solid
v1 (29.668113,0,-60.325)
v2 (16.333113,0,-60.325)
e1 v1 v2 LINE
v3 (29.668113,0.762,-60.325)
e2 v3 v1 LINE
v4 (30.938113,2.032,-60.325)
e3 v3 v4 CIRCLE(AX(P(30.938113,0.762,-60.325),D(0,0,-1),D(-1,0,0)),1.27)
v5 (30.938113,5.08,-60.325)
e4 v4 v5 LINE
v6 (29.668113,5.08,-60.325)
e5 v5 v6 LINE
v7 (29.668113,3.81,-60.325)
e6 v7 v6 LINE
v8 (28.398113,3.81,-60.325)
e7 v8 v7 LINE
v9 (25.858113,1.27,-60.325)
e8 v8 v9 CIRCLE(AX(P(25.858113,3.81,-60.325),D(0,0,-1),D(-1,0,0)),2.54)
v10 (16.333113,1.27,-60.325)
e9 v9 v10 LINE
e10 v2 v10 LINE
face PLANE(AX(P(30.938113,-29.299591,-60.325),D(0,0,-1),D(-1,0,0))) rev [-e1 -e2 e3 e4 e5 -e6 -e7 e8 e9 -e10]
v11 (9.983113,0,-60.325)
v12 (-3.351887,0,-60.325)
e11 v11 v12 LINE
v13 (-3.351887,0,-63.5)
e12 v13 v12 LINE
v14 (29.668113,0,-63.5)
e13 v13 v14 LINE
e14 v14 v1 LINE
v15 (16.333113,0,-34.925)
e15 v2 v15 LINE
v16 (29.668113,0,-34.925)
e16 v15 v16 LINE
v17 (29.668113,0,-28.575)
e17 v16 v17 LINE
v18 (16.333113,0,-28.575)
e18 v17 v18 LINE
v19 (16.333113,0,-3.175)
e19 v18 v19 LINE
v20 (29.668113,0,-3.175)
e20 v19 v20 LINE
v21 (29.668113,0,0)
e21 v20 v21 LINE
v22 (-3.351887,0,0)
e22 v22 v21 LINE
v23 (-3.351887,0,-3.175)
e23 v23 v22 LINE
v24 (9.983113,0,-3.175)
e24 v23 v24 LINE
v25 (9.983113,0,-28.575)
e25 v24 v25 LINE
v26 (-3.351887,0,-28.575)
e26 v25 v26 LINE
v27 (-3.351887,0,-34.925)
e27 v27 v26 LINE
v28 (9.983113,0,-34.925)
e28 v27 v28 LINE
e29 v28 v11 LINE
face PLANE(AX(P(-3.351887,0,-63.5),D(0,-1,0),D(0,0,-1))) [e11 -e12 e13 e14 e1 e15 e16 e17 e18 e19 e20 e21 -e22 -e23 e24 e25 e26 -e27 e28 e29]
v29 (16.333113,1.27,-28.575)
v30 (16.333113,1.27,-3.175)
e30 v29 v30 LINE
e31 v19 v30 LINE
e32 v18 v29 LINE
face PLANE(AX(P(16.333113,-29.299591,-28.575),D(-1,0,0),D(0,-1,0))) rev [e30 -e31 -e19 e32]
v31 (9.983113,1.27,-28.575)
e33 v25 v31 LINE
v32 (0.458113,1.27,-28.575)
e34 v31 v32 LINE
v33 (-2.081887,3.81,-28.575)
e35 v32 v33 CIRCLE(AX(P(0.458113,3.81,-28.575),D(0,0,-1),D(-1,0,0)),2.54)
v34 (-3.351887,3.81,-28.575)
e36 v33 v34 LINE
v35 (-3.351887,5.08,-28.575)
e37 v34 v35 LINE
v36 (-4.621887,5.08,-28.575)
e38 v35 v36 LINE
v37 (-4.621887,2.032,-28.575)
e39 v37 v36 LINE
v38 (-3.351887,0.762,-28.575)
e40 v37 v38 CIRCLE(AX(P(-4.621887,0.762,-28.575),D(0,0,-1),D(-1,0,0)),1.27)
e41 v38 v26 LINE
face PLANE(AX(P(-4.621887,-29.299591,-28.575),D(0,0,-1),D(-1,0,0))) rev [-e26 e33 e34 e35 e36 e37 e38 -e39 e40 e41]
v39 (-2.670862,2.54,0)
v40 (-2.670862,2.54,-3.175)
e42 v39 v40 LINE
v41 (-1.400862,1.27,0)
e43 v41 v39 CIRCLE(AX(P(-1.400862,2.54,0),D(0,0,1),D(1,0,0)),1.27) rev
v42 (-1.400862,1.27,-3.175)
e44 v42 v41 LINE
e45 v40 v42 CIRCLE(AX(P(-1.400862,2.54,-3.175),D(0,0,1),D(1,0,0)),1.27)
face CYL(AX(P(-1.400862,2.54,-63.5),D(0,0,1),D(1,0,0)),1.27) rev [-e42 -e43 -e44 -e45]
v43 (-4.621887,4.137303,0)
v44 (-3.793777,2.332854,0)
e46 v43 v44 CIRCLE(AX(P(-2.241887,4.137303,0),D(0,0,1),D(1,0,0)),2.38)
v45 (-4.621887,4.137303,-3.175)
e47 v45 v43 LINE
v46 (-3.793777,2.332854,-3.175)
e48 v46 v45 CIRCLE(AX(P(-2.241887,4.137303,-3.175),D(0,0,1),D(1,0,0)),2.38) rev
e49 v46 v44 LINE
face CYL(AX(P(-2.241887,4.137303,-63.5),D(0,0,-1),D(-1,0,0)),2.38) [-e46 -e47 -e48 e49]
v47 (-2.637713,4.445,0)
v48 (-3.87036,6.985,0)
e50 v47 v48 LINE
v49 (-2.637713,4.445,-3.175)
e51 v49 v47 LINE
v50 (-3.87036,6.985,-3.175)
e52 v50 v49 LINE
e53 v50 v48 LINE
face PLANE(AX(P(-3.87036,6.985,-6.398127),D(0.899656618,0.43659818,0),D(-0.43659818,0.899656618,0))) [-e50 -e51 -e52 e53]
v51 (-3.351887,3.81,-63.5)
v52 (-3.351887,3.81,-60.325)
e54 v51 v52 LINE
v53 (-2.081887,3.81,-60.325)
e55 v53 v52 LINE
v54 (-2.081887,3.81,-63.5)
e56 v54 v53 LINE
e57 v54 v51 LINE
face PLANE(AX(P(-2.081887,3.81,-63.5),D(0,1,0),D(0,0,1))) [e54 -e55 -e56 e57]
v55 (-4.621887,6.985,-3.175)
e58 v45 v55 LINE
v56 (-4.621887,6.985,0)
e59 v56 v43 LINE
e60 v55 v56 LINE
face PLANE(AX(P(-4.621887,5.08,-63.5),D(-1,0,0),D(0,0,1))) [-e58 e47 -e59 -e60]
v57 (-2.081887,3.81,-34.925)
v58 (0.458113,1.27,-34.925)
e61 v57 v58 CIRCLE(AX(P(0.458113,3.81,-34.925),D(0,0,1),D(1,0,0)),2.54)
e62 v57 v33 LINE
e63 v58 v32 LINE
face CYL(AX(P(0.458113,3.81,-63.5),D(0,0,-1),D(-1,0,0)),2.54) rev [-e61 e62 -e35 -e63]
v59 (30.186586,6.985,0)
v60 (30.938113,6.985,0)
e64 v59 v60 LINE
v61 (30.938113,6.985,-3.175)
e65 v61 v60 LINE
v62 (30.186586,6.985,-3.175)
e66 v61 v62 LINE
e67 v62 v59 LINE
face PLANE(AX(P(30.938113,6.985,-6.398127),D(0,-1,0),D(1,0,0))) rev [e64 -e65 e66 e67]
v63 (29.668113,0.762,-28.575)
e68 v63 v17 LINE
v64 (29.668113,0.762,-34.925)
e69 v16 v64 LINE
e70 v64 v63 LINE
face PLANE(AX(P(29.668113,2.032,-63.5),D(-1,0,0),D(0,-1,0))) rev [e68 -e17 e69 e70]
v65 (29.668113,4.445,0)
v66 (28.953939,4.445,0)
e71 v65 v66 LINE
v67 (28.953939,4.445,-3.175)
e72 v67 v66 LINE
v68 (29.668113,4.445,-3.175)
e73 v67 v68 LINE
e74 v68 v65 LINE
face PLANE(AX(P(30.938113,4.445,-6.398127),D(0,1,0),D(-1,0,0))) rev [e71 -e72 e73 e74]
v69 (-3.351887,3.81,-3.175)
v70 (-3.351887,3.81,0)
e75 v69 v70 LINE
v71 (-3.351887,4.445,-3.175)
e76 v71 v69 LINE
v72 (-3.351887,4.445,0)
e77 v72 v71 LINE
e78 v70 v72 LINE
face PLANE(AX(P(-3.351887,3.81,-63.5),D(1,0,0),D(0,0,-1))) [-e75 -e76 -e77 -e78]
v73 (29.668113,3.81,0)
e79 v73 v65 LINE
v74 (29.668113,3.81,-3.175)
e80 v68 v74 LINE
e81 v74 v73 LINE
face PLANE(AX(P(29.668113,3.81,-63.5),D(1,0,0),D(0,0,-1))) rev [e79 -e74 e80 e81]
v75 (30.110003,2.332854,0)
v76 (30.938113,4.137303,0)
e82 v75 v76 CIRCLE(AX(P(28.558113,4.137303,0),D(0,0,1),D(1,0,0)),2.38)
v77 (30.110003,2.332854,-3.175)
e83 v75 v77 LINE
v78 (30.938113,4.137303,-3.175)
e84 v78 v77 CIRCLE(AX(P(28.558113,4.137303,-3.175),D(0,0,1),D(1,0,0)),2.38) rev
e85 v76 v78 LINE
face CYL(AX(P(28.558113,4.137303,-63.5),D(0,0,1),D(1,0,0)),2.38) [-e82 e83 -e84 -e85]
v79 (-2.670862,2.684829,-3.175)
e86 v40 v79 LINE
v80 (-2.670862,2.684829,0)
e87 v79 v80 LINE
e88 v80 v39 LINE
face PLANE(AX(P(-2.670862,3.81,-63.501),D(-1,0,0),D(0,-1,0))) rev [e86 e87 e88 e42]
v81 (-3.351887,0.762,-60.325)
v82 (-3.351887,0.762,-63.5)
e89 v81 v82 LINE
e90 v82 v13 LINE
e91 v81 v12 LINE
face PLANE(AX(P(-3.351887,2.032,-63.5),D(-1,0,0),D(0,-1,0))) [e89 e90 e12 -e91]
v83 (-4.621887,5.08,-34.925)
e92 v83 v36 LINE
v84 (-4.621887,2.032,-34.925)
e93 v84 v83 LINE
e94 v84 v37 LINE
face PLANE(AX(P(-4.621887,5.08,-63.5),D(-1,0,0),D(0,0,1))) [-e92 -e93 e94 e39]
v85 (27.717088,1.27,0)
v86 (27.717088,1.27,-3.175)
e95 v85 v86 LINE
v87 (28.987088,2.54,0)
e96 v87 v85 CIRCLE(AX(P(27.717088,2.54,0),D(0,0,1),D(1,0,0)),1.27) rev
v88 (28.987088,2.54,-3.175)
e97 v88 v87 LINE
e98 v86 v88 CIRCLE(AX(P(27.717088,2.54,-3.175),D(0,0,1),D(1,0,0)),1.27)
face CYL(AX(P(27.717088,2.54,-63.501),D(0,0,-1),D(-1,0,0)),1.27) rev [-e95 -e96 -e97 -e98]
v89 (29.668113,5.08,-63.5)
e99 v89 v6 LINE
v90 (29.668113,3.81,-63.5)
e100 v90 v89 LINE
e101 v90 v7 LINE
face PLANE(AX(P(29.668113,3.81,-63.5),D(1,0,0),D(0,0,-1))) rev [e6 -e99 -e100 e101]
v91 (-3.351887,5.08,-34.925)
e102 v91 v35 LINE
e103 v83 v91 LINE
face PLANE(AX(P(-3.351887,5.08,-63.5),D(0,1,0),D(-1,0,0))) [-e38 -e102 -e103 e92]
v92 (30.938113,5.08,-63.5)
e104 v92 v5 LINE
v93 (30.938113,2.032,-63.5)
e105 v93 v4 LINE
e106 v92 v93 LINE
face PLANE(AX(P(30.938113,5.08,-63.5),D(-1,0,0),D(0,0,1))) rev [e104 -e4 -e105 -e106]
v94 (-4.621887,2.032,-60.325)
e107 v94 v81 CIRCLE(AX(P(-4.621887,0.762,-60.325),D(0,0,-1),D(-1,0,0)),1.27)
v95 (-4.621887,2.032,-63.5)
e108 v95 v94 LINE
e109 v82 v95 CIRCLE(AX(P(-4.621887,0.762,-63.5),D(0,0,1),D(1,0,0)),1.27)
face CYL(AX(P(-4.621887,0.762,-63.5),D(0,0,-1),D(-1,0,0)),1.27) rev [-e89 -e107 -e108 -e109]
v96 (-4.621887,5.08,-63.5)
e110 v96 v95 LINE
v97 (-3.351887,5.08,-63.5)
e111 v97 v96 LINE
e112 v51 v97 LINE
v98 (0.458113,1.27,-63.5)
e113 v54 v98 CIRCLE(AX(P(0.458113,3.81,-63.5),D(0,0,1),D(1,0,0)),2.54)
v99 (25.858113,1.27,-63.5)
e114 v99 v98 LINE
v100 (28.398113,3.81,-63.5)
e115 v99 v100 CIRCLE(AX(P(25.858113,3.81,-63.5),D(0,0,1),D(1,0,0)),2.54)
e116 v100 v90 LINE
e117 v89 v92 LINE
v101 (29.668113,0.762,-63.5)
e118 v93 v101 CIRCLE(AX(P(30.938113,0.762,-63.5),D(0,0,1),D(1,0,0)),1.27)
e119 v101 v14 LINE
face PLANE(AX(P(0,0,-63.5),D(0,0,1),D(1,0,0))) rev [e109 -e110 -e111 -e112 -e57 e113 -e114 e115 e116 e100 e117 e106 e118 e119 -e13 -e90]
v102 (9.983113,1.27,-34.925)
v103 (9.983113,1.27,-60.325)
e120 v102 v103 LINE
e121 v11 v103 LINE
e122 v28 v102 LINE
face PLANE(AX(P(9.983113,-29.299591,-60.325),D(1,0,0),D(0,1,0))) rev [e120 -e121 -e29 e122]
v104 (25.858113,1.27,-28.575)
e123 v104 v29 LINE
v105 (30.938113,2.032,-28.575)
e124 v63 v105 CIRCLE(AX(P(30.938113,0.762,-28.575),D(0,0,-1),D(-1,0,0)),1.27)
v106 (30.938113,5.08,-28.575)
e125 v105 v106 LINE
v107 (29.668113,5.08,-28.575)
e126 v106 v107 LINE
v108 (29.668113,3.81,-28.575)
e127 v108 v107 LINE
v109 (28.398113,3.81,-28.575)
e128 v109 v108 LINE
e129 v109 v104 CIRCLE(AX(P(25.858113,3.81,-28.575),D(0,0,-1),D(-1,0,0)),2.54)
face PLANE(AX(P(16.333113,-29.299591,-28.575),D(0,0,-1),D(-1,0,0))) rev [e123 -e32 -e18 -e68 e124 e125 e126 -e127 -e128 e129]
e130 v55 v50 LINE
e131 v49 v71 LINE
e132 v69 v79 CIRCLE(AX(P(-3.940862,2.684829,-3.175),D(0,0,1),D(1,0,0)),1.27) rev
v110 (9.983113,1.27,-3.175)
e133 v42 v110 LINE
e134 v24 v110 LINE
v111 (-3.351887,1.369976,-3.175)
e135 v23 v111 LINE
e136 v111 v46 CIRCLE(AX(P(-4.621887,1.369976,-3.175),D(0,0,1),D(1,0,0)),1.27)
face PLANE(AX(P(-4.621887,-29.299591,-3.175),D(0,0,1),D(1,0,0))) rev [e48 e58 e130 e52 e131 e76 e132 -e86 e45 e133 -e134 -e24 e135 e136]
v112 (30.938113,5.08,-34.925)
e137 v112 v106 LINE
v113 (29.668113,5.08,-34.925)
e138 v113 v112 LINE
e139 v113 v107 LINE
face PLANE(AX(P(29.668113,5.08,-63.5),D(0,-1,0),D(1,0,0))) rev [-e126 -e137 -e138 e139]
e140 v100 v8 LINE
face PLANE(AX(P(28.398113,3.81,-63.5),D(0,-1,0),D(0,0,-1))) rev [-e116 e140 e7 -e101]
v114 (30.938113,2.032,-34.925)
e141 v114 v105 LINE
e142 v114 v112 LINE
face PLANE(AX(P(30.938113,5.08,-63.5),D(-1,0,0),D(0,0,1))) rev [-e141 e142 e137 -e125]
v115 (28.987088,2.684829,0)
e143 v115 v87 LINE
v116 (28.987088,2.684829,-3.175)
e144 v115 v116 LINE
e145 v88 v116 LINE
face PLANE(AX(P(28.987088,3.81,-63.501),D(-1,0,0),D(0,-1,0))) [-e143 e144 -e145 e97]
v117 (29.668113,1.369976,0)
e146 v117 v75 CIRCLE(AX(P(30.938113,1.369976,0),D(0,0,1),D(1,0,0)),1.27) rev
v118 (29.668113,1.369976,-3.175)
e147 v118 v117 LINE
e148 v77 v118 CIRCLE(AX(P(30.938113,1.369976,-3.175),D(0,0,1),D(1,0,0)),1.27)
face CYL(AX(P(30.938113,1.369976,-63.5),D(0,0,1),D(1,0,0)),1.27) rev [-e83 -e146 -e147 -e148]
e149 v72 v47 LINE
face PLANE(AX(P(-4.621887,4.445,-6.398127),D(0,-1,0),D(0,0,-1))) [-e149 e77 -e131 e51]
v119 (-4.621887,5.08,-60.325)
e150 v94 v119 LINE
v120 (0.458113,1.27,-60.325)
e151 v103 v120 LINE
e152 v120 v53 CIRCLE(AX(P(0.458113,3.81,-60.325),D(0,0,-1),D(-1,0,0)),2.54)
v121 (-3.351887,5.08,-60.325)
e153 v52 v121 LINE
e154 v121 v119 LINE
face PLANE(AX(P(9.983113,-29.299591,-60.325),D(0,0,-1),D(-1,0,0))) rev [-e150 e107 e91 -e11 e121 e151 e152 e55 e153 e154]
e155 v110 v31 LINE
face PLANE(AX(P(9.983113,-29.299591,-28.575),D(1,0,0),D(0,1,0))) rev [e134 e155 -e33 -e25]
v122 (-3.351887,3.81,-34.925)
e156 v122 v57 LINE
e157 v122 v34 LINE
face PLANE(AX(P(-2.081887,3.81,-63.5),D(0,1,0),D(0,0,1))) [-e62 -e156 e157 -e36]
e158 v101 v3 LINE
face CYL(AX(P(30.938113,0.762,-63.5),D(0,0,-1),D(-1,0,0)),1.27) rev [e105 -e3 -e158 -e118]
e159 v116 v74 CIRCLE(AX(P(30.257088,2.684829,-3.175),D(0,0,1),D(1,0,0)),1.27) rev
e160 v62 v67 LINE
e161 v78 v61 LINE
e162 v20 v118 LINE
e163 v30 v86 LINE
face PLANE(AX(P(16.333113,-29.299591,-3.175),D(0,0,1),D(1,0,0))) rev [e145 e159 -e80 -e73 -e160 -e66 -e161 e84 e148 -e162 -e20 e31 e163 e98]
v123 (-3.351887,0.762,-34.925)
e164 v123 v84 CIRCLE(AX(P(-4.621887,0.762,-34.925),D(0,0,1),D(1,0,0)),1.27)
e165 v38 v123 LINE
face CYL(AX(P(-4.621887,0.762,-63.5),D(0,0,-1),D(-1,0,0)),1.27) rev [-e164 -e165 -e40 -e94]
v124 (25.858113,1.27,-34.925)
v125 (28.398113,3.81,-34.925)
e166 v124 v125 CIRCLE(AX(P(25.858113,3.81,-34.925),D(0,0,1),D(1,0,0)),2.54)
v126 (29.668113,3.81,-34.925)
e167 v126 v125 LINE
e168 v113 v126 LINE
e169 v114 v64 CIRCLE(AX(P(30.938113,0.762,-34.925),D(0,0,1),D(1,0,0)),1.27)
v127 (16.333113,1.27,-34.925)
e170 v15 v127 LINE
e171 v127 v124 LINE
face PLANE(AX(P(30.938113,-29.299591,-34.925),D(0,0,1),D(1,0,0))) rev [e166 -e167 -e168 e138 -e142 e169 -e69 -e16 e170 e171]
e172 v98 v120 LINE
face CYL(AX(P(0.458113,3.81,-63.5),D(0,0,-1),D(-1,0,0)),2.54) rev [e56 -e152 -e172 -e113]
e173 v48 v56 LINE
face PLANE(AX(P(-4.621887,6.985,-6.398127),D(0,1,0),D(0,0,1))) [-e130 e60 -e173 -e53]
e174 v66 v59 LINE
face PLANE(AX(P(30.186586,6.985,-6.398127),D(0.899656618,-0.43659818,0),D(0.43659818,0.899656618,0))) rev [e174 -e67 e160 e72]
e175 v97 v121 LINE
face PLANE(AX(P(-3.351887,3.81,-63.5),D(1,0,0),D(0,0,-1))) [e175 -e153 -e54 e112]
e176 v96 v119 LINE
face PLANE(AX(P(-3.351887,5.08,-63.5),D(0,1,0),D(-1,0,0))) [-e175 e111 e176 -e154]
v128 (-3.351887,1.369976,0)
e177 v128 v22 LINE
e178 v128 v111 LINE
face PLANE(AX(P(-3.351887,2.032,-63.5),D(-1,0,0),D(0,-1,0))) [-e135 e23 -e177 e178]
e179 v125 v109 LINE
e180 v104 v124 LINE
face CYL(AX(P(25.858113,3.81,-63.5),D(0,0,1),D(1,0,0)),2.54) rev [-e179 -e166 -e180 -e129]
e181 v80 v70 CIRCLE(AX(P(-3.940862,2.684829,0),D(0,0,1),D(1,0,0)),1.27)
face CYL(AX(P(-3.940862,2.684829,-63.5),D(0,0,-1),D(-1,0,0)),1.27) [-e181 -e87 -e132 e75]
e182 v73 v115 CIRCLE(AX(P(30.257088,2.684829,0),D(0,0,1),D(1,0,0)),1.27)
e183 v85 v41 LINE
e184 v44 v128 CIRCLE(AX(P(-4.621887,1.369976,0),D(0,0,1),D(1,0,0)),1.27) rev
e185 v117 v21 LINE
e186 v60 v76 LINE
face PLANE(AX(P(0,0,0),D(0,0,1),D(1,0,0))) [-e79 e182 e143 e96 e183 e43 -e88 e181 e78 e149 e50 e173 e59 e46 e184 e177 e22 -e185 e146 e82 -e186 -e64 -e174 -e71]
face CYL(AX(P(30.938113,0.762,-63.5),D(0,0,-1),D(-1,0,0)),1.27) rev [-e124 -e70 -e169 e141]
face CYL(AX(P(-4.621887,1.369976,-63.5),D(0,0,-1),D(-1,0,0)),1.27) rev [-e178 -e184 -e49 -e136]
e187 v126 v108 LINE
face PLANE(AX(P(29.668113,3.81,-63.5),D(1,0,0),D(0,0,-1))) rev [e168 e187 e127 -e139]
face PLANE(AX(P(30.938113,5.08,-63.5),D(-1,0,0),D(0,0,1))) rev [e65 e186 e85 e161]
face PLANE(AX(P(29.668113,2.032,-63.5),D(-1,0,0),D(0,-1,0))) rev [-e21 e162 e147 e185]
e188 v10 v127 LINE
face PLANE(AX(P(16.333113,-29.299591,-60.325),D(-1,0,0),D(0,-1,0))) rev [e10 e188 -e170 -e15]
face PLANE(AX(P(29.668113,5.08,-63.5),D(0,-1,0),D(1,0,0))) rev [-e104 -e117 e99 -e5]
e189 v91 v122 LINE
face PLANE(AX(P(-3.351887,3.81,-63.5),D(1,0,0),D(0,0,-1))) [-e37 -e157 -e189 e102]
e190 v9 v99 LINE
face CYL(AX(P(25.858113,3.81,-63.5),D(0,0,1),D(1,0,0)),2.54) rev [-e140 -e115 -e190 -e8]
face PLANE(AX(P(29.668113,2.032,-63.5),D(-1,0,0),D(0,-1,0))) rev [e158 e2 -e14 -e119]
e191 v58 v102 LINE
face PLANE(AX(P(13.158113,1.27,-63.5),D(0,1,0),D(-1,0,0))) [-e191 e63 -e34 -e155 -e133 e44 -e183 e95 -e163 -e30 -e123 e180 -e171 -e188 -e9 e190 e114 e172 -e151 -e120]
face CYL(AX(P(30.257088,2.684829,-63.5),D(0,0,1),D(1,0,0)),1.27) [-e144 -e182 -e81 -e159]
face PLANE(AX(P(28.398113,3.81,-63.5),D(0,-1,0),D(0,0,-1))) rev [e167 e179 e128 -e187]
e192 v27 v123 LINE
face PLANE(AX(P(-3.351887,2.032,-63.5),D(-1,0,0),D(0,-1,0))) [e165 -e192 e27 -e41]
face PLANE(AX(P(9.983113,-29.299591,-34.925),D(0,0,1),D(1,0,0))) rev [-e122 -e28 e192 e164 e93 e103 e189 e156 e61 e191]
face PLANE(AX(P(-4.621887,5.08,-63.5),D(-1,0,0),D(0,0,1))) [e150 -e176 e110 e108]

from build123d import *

# Parameters (mm, degrees)
BOSS_EXTRUDE1_DEPTH = 63.5
CUT_EXTRUDE1_REACH  = 72.818
SKETCH2_W           = 14.605
SKETCH2_H           = 25.4
BOSS_EXTRUDE2_DEPTH = 3.175
CUT_EXTRUDE2_REACH  = 72.98
SKETCH4_W           = 0.588974589
SKETCH4_H           = 2.54
FILLET1_R           = 2.38
FILLET2_R           = 1.27
FILLET3_R           = 2.54
FILLET5_R           = 1.27
FILLET6_R           = 1.27


# Some blends are built 0.0001 mm under size
with BuildPart() as part:
    # Sketch1 → Boss-Extrude1 (new body)
    with BuildSketch(Plane.XY):
        Polygon((0, 0), (13.158113026, 0), (13.158113026, 1.27), (-2.081886974, 1.27), (-2.081886974, 3.81), (-3.351886974, 3.81), (-3.351886974, 5.08), (-4.621886974, 5.08), (-4.621886974, 2.032), (-3.351886974, 2.032), (-3.351886974, 0), align=None)
    boss_extrude1 = extrude(amount=-BOSS_EXTRUDE1_DEPTH)

    # Mirror1: Boss-Extrude1 across plane
    add(boss_extrude1.mirror(Plane(origin=(13.158113026, 1.27, -63.5), x_dir=(0, 0, 1), z_dir=(-1, 0, 0))))

    # Cut-Extrude1: up to this face of the body (flat: up to its plane)
    cut_extrude1_end = Plane(part.part.faces().sort_by_distance((13.158113026, 0, -31.75))[0])
    # Sketch2 → Cut-Extrude1 (cut, up to the picked face)
    with BuildSketch(Plane(origin=(0, 5.08, 0), x_dir=(1, 0, 0), z_dir=(0, 1, 0)), mode=Mode.PRIVATE) as cut_extrude1_sk1:
        with Locations((2.680613026, 15.875)):
            Rectangle(SKETCH2_W, SKETCH2_H)
    cut_extrude1_tool1 = split(extrude(cut_extrude1_sk1.sketch, amount=-CUT_EXTRUDE1_REACH, mode=Mode.PRIVATE), bisect_by=cut_extrude1_end, keep=Keep.BOTH, mode=Mode.PRIVATE)
    # Sketch2 → Cut-Extrude1 (cut, up to the picked face)
    with BuildSketch(Plane(origin=(0, 5.08, 0), x_dir=(1, 0, 0), z_dir=(0, 1, 0)), mode=Mode.PRIVATE) as cut_extrude1_sk2:
        with Locations((23.635613026, 15.875)):
            Rectangle(SKETCH2_W, SKETCH2_H)
    cut_extrude1_tool2 = split(extrude(cut_extrude1_sk2.sketch, amount=-CUT_EXTRUDE1_REACH, mode=Mode.PRIVATE), bisect_by=cut_extrude1_end, keep=Keep.BOTH, mode=Mode.PRIVATE)
    # Sketch2 → Cut-Extrude1 (cut, up to the picked face)
    with BuildSketch(Plane(origin=(0, 5.08, 0), x_dir=(1, 0, 0), z_dir=(0, 1, 0)), mode=Mode.PRIVATE) as cut_extrude1_sk3:
        with Locations((2.680613026, 47.625)):
            Rectangle(SKETCH2_W, SKETCH2_H)
    cut_extrude1_tool3 = split(extrude(cut_extrude1_sk3.sketch, amount=-CUT_EXTRUDE1_REACH, mode=Mode.PRIVATE), bisect_by=cut_extrude1_end, keep=Keep.BOTH, mode=Mode.PRIVATE)
    # Sketch2 → Cut-Extrude1 (cut, up to the picked face)
    with BuildSketch(Plane(origin=(0, 5.08, 0), x_dir=(1, 0, 0), z_dir=(0, 1, 0)), mode=Mode.PRIVATE) as cut_extrude1_sk4:
        with Locations((23.635613026, 47.625)):
            Rectangle(SKETCH2_W, SKETCH2_H)
    cut_extrude1_tool4 = split(extrude(cut_extrude1_sk4.sketch, amount=-CUT_EXTRUDE1_REACH, mode=Mode.PRIVATE), bisect_by=cut_extrude1_end, keep=Keep.BOTH, mode=Mode.PRIVATE)
    add(cut_extrude1_tool1.solids().sort_by(Axis((2.680613, 5.08, -15.875), (0, -1, 0)))[0], mode=Mode.SUBTRACT)
    add(cut_extrude1_tool2.solids().sort_by(Axis((23.635613, 5.08, -15.875), (0, -1, 0)))[0], mode=Mode.SUBTRACT)
    add(cut_extrude1_tool3.solids().sort_by(Axis((2.680613, 5.08, -47.625), (0, -1, 0)))[0], mode=Mode.SUBTRACT)
    add(cut_extrude1_tool4.solids().sort_by(Axis((23.635613, 5.08, -47.625), (0, -1, 0)))[0], mode=Mode.SUBTRACT)

    # Sketch3 → Boss-Extrude2 (add)
    with BuildSketch(Plane.XY):
        Polygon((-4.621886974, 4.445), (-2.637712851, 4.445), (-3.870360235, 6.985), (-4.621886974, 6.985), align=None)
    boss_extrude2 = extrude(amount=-BOSS_EXTRUDE2_DEPTH)

    # Mirror2: Boss-Extrude2 across plane
    add(boss_extrude2.mirror(Plane.ZY.offset(-13.158113026)))

    # Sketch4 → Cut-Extrude2 (cut, up to next)
    with BuildSketch(Plane.XY, mode=Mode.PRIVATE) as cut_extrude2_sk1:
        with Locations((-2.376374269, 2.54)):
            Rectangle(SKETCH4_W, SKETCH4_H)
    cut_extrude2_tool1 = extrude(cut_extrude2_sk1.sketch, amount=-CUT_EXTRUDE2_REACH, mode=Mode.PRIVATE) & part.part
    cut_extrude2 = cut_extrude2_tool1.solids().sort_by_distance((-2.376374, 2.54, 0))[0]
    add(cut_extrude2, mode=Mode.SUBTRACT)

    # Mirror3: Cut-Extrude2 across plane
    add(cut_extrude2.mirror(Plane.ZY.offset(-13.158113026)), mode=Mode.SUBTRACT)

    # Fillet1
    # the kernel refuses this fillet: 2.38 mm, written as the material it takes off along each edge
    with BuildSketch(Plane(origin=(30.938113026, 2.032, 5.263257071), x_dir=(0, 1, 0), z_dir=(0, 0, -1))) as fillet1_piece_1:
        with BuildLine():
            CenterArc((2.105302829, -2.38), FILLET1_R, 90, 62.200005552)
            Line((0, -1.27), (-0.042106057, -1.2478))
            ThreePointArc((-0.042106057, -1.2478), (-0.0476, -0.635), (-0.0476, 0))
            Line((-0.0476, 0), (0, 0.0476))
            Line((0, 0.0476), (2.105302829, 0.0476))
            Line((2.105302829, 0.0476), (2.105302829, 0))
        make_face()
    extrude(amount=13.701514143, mode=Mode.SUBTRACT)
    with BuildSketch(Plane(origin=(-4.621886974, 2.032, 5.263257071), x_dir=(1, 0, 0), z_dir=(0, 0, -1))) as fillet1_piece_2:
        with BuildLine():
            CenterArc((2.38, -2.105302829), FILLET1_R, 117.799994448, 62.200005552)
            Line((0, -2.105302829), (-0.0476, -2.105302829))
            Line((-0.0476, -2.105302829), (-0.0476, 0))
            Line((-0.0476, 0), (0, 0.0476))
            ThreePointArc((0, 0.0476), (0.635, 0.0476), (1.2478, 0.042106057))
            Line((1.2478, 0.042106057), (1.27, 0))
        make_face()
    extrude(amount=13.701514143, mode=Mode.SUBTRACT)

    # Fillet2
    # the kernel refuses this fillet: 1.27 mm, written as the material it adds along each edge
    with BuildSketch(Plane(origin=(-3.351886974, 2.032, 0), x_dir=(0, -1, 0), z_dir=(0, 0, -1))) as fillet2_piece_1:
        with BuildLine():
            CenterArc((0.662024402, 1.27), FILLET2_R, 220.696704321, 49.303295679)
            ThreePointArc((-0.30085384, 0.441890411), (-0.137980638, 0.229419053), (0, 0))
            Line((0, 0), (0.662024402, 0))
        make_face()
    extrude(amount=3.175)
    with BuildSketch(Plane(origin=(29.668113026, 2.032, 0), x_dir=(0, -1, 0), z_dir=(0, 0, -1))) as fillet2_piece_2:
        with BuildLine():
            CenterArc((0.662024402, -1.27), FILLET2_R, 90, 49.303295679)
            ThreePointArc((-0.30085384, -0.441890411), (-0.137980638, -0.229419053), (0, 0))
            Line((0, 0), (0.662024402, 0))
        make_face()
    extrude(amount=3.175)
    # the kernel refuses this fillet: 1.27 mm, written as the material it takes off along each edge
    with BuildSketch(Plane(origin=(28.987087615, 3.81, 2.81292656), x_dir=(0, -1, 0), z_dir=(0, 0, -1))) as fillet2_2_piece_1:
        with BuildLine():
            CenterArc((1.125170624, -1.27), FILLET2_R, 90, 62.370030247)
            Line((0, -0.681025411), (0, 0))
            Line((0, 0), (1.125170624, 0))
        make_face()
    extrude(amount=8.800853121, mode=Mode.SUBTRACT)
    with BuildSketch(Plane(origin=(-2.670861563, 3.81, 2.81292656), x_dir=(-1, 0, 0), z_dir=(0, 0, -1))) as fillet2_2_piece_2:
        with BuildLine():
            CenterArc((1.27, -1.125170624), FILLET2_R, 117.629969753, 62.370030247)
            Line((0, -1.125170624), (0, 0))
            Line((0, 0), (0.681025411, 0))
        make_face()
    extrude(amount=8.800853121, mode=Mode.SUBTRACT)

    # Fillet3
    fillet3_edges = [part.edges().sort_by_distance(p)[0] for p in [
        (28.398113026, 1.27, -31.75),
        (28.398113026, 1.27, -61.9125),
        (-2.081886974, 1.27, -61.9125),
        (-2.081886974, 1.27, -31.75),
    ]]
    fillet(fillet3_edges, radius=FILLET3_R - 0.0001)  # a hair under: the kernel refuses the full size

    # Fillet5
    fillet5_edges = [part.edges().sort_by_distance(p)[0] for p in [
        (29.668113026, 2.032, -61.9125),
        (29.668113026, 2.032, -31.75),
        (-3.351886974, 2.032, -61.9125),
        (-3.351886974, 2.032, -31.75),
    ]]
    fillet(fillet5_edges, radius=FILLET5_R - 0.0001)  # a hair under: the kernel refuses the full size

    # Fillet6
    fillet6_edges = [part.edges().sort_by_distance(p)[0] for p in [
        (-2.670861563, 1.27, -1.5875),
        (28.987087615, 1.27, -1.5875),
    ]]
    fillet(fillet6_edges, radius=FILLET6_R)


solid = part.part
